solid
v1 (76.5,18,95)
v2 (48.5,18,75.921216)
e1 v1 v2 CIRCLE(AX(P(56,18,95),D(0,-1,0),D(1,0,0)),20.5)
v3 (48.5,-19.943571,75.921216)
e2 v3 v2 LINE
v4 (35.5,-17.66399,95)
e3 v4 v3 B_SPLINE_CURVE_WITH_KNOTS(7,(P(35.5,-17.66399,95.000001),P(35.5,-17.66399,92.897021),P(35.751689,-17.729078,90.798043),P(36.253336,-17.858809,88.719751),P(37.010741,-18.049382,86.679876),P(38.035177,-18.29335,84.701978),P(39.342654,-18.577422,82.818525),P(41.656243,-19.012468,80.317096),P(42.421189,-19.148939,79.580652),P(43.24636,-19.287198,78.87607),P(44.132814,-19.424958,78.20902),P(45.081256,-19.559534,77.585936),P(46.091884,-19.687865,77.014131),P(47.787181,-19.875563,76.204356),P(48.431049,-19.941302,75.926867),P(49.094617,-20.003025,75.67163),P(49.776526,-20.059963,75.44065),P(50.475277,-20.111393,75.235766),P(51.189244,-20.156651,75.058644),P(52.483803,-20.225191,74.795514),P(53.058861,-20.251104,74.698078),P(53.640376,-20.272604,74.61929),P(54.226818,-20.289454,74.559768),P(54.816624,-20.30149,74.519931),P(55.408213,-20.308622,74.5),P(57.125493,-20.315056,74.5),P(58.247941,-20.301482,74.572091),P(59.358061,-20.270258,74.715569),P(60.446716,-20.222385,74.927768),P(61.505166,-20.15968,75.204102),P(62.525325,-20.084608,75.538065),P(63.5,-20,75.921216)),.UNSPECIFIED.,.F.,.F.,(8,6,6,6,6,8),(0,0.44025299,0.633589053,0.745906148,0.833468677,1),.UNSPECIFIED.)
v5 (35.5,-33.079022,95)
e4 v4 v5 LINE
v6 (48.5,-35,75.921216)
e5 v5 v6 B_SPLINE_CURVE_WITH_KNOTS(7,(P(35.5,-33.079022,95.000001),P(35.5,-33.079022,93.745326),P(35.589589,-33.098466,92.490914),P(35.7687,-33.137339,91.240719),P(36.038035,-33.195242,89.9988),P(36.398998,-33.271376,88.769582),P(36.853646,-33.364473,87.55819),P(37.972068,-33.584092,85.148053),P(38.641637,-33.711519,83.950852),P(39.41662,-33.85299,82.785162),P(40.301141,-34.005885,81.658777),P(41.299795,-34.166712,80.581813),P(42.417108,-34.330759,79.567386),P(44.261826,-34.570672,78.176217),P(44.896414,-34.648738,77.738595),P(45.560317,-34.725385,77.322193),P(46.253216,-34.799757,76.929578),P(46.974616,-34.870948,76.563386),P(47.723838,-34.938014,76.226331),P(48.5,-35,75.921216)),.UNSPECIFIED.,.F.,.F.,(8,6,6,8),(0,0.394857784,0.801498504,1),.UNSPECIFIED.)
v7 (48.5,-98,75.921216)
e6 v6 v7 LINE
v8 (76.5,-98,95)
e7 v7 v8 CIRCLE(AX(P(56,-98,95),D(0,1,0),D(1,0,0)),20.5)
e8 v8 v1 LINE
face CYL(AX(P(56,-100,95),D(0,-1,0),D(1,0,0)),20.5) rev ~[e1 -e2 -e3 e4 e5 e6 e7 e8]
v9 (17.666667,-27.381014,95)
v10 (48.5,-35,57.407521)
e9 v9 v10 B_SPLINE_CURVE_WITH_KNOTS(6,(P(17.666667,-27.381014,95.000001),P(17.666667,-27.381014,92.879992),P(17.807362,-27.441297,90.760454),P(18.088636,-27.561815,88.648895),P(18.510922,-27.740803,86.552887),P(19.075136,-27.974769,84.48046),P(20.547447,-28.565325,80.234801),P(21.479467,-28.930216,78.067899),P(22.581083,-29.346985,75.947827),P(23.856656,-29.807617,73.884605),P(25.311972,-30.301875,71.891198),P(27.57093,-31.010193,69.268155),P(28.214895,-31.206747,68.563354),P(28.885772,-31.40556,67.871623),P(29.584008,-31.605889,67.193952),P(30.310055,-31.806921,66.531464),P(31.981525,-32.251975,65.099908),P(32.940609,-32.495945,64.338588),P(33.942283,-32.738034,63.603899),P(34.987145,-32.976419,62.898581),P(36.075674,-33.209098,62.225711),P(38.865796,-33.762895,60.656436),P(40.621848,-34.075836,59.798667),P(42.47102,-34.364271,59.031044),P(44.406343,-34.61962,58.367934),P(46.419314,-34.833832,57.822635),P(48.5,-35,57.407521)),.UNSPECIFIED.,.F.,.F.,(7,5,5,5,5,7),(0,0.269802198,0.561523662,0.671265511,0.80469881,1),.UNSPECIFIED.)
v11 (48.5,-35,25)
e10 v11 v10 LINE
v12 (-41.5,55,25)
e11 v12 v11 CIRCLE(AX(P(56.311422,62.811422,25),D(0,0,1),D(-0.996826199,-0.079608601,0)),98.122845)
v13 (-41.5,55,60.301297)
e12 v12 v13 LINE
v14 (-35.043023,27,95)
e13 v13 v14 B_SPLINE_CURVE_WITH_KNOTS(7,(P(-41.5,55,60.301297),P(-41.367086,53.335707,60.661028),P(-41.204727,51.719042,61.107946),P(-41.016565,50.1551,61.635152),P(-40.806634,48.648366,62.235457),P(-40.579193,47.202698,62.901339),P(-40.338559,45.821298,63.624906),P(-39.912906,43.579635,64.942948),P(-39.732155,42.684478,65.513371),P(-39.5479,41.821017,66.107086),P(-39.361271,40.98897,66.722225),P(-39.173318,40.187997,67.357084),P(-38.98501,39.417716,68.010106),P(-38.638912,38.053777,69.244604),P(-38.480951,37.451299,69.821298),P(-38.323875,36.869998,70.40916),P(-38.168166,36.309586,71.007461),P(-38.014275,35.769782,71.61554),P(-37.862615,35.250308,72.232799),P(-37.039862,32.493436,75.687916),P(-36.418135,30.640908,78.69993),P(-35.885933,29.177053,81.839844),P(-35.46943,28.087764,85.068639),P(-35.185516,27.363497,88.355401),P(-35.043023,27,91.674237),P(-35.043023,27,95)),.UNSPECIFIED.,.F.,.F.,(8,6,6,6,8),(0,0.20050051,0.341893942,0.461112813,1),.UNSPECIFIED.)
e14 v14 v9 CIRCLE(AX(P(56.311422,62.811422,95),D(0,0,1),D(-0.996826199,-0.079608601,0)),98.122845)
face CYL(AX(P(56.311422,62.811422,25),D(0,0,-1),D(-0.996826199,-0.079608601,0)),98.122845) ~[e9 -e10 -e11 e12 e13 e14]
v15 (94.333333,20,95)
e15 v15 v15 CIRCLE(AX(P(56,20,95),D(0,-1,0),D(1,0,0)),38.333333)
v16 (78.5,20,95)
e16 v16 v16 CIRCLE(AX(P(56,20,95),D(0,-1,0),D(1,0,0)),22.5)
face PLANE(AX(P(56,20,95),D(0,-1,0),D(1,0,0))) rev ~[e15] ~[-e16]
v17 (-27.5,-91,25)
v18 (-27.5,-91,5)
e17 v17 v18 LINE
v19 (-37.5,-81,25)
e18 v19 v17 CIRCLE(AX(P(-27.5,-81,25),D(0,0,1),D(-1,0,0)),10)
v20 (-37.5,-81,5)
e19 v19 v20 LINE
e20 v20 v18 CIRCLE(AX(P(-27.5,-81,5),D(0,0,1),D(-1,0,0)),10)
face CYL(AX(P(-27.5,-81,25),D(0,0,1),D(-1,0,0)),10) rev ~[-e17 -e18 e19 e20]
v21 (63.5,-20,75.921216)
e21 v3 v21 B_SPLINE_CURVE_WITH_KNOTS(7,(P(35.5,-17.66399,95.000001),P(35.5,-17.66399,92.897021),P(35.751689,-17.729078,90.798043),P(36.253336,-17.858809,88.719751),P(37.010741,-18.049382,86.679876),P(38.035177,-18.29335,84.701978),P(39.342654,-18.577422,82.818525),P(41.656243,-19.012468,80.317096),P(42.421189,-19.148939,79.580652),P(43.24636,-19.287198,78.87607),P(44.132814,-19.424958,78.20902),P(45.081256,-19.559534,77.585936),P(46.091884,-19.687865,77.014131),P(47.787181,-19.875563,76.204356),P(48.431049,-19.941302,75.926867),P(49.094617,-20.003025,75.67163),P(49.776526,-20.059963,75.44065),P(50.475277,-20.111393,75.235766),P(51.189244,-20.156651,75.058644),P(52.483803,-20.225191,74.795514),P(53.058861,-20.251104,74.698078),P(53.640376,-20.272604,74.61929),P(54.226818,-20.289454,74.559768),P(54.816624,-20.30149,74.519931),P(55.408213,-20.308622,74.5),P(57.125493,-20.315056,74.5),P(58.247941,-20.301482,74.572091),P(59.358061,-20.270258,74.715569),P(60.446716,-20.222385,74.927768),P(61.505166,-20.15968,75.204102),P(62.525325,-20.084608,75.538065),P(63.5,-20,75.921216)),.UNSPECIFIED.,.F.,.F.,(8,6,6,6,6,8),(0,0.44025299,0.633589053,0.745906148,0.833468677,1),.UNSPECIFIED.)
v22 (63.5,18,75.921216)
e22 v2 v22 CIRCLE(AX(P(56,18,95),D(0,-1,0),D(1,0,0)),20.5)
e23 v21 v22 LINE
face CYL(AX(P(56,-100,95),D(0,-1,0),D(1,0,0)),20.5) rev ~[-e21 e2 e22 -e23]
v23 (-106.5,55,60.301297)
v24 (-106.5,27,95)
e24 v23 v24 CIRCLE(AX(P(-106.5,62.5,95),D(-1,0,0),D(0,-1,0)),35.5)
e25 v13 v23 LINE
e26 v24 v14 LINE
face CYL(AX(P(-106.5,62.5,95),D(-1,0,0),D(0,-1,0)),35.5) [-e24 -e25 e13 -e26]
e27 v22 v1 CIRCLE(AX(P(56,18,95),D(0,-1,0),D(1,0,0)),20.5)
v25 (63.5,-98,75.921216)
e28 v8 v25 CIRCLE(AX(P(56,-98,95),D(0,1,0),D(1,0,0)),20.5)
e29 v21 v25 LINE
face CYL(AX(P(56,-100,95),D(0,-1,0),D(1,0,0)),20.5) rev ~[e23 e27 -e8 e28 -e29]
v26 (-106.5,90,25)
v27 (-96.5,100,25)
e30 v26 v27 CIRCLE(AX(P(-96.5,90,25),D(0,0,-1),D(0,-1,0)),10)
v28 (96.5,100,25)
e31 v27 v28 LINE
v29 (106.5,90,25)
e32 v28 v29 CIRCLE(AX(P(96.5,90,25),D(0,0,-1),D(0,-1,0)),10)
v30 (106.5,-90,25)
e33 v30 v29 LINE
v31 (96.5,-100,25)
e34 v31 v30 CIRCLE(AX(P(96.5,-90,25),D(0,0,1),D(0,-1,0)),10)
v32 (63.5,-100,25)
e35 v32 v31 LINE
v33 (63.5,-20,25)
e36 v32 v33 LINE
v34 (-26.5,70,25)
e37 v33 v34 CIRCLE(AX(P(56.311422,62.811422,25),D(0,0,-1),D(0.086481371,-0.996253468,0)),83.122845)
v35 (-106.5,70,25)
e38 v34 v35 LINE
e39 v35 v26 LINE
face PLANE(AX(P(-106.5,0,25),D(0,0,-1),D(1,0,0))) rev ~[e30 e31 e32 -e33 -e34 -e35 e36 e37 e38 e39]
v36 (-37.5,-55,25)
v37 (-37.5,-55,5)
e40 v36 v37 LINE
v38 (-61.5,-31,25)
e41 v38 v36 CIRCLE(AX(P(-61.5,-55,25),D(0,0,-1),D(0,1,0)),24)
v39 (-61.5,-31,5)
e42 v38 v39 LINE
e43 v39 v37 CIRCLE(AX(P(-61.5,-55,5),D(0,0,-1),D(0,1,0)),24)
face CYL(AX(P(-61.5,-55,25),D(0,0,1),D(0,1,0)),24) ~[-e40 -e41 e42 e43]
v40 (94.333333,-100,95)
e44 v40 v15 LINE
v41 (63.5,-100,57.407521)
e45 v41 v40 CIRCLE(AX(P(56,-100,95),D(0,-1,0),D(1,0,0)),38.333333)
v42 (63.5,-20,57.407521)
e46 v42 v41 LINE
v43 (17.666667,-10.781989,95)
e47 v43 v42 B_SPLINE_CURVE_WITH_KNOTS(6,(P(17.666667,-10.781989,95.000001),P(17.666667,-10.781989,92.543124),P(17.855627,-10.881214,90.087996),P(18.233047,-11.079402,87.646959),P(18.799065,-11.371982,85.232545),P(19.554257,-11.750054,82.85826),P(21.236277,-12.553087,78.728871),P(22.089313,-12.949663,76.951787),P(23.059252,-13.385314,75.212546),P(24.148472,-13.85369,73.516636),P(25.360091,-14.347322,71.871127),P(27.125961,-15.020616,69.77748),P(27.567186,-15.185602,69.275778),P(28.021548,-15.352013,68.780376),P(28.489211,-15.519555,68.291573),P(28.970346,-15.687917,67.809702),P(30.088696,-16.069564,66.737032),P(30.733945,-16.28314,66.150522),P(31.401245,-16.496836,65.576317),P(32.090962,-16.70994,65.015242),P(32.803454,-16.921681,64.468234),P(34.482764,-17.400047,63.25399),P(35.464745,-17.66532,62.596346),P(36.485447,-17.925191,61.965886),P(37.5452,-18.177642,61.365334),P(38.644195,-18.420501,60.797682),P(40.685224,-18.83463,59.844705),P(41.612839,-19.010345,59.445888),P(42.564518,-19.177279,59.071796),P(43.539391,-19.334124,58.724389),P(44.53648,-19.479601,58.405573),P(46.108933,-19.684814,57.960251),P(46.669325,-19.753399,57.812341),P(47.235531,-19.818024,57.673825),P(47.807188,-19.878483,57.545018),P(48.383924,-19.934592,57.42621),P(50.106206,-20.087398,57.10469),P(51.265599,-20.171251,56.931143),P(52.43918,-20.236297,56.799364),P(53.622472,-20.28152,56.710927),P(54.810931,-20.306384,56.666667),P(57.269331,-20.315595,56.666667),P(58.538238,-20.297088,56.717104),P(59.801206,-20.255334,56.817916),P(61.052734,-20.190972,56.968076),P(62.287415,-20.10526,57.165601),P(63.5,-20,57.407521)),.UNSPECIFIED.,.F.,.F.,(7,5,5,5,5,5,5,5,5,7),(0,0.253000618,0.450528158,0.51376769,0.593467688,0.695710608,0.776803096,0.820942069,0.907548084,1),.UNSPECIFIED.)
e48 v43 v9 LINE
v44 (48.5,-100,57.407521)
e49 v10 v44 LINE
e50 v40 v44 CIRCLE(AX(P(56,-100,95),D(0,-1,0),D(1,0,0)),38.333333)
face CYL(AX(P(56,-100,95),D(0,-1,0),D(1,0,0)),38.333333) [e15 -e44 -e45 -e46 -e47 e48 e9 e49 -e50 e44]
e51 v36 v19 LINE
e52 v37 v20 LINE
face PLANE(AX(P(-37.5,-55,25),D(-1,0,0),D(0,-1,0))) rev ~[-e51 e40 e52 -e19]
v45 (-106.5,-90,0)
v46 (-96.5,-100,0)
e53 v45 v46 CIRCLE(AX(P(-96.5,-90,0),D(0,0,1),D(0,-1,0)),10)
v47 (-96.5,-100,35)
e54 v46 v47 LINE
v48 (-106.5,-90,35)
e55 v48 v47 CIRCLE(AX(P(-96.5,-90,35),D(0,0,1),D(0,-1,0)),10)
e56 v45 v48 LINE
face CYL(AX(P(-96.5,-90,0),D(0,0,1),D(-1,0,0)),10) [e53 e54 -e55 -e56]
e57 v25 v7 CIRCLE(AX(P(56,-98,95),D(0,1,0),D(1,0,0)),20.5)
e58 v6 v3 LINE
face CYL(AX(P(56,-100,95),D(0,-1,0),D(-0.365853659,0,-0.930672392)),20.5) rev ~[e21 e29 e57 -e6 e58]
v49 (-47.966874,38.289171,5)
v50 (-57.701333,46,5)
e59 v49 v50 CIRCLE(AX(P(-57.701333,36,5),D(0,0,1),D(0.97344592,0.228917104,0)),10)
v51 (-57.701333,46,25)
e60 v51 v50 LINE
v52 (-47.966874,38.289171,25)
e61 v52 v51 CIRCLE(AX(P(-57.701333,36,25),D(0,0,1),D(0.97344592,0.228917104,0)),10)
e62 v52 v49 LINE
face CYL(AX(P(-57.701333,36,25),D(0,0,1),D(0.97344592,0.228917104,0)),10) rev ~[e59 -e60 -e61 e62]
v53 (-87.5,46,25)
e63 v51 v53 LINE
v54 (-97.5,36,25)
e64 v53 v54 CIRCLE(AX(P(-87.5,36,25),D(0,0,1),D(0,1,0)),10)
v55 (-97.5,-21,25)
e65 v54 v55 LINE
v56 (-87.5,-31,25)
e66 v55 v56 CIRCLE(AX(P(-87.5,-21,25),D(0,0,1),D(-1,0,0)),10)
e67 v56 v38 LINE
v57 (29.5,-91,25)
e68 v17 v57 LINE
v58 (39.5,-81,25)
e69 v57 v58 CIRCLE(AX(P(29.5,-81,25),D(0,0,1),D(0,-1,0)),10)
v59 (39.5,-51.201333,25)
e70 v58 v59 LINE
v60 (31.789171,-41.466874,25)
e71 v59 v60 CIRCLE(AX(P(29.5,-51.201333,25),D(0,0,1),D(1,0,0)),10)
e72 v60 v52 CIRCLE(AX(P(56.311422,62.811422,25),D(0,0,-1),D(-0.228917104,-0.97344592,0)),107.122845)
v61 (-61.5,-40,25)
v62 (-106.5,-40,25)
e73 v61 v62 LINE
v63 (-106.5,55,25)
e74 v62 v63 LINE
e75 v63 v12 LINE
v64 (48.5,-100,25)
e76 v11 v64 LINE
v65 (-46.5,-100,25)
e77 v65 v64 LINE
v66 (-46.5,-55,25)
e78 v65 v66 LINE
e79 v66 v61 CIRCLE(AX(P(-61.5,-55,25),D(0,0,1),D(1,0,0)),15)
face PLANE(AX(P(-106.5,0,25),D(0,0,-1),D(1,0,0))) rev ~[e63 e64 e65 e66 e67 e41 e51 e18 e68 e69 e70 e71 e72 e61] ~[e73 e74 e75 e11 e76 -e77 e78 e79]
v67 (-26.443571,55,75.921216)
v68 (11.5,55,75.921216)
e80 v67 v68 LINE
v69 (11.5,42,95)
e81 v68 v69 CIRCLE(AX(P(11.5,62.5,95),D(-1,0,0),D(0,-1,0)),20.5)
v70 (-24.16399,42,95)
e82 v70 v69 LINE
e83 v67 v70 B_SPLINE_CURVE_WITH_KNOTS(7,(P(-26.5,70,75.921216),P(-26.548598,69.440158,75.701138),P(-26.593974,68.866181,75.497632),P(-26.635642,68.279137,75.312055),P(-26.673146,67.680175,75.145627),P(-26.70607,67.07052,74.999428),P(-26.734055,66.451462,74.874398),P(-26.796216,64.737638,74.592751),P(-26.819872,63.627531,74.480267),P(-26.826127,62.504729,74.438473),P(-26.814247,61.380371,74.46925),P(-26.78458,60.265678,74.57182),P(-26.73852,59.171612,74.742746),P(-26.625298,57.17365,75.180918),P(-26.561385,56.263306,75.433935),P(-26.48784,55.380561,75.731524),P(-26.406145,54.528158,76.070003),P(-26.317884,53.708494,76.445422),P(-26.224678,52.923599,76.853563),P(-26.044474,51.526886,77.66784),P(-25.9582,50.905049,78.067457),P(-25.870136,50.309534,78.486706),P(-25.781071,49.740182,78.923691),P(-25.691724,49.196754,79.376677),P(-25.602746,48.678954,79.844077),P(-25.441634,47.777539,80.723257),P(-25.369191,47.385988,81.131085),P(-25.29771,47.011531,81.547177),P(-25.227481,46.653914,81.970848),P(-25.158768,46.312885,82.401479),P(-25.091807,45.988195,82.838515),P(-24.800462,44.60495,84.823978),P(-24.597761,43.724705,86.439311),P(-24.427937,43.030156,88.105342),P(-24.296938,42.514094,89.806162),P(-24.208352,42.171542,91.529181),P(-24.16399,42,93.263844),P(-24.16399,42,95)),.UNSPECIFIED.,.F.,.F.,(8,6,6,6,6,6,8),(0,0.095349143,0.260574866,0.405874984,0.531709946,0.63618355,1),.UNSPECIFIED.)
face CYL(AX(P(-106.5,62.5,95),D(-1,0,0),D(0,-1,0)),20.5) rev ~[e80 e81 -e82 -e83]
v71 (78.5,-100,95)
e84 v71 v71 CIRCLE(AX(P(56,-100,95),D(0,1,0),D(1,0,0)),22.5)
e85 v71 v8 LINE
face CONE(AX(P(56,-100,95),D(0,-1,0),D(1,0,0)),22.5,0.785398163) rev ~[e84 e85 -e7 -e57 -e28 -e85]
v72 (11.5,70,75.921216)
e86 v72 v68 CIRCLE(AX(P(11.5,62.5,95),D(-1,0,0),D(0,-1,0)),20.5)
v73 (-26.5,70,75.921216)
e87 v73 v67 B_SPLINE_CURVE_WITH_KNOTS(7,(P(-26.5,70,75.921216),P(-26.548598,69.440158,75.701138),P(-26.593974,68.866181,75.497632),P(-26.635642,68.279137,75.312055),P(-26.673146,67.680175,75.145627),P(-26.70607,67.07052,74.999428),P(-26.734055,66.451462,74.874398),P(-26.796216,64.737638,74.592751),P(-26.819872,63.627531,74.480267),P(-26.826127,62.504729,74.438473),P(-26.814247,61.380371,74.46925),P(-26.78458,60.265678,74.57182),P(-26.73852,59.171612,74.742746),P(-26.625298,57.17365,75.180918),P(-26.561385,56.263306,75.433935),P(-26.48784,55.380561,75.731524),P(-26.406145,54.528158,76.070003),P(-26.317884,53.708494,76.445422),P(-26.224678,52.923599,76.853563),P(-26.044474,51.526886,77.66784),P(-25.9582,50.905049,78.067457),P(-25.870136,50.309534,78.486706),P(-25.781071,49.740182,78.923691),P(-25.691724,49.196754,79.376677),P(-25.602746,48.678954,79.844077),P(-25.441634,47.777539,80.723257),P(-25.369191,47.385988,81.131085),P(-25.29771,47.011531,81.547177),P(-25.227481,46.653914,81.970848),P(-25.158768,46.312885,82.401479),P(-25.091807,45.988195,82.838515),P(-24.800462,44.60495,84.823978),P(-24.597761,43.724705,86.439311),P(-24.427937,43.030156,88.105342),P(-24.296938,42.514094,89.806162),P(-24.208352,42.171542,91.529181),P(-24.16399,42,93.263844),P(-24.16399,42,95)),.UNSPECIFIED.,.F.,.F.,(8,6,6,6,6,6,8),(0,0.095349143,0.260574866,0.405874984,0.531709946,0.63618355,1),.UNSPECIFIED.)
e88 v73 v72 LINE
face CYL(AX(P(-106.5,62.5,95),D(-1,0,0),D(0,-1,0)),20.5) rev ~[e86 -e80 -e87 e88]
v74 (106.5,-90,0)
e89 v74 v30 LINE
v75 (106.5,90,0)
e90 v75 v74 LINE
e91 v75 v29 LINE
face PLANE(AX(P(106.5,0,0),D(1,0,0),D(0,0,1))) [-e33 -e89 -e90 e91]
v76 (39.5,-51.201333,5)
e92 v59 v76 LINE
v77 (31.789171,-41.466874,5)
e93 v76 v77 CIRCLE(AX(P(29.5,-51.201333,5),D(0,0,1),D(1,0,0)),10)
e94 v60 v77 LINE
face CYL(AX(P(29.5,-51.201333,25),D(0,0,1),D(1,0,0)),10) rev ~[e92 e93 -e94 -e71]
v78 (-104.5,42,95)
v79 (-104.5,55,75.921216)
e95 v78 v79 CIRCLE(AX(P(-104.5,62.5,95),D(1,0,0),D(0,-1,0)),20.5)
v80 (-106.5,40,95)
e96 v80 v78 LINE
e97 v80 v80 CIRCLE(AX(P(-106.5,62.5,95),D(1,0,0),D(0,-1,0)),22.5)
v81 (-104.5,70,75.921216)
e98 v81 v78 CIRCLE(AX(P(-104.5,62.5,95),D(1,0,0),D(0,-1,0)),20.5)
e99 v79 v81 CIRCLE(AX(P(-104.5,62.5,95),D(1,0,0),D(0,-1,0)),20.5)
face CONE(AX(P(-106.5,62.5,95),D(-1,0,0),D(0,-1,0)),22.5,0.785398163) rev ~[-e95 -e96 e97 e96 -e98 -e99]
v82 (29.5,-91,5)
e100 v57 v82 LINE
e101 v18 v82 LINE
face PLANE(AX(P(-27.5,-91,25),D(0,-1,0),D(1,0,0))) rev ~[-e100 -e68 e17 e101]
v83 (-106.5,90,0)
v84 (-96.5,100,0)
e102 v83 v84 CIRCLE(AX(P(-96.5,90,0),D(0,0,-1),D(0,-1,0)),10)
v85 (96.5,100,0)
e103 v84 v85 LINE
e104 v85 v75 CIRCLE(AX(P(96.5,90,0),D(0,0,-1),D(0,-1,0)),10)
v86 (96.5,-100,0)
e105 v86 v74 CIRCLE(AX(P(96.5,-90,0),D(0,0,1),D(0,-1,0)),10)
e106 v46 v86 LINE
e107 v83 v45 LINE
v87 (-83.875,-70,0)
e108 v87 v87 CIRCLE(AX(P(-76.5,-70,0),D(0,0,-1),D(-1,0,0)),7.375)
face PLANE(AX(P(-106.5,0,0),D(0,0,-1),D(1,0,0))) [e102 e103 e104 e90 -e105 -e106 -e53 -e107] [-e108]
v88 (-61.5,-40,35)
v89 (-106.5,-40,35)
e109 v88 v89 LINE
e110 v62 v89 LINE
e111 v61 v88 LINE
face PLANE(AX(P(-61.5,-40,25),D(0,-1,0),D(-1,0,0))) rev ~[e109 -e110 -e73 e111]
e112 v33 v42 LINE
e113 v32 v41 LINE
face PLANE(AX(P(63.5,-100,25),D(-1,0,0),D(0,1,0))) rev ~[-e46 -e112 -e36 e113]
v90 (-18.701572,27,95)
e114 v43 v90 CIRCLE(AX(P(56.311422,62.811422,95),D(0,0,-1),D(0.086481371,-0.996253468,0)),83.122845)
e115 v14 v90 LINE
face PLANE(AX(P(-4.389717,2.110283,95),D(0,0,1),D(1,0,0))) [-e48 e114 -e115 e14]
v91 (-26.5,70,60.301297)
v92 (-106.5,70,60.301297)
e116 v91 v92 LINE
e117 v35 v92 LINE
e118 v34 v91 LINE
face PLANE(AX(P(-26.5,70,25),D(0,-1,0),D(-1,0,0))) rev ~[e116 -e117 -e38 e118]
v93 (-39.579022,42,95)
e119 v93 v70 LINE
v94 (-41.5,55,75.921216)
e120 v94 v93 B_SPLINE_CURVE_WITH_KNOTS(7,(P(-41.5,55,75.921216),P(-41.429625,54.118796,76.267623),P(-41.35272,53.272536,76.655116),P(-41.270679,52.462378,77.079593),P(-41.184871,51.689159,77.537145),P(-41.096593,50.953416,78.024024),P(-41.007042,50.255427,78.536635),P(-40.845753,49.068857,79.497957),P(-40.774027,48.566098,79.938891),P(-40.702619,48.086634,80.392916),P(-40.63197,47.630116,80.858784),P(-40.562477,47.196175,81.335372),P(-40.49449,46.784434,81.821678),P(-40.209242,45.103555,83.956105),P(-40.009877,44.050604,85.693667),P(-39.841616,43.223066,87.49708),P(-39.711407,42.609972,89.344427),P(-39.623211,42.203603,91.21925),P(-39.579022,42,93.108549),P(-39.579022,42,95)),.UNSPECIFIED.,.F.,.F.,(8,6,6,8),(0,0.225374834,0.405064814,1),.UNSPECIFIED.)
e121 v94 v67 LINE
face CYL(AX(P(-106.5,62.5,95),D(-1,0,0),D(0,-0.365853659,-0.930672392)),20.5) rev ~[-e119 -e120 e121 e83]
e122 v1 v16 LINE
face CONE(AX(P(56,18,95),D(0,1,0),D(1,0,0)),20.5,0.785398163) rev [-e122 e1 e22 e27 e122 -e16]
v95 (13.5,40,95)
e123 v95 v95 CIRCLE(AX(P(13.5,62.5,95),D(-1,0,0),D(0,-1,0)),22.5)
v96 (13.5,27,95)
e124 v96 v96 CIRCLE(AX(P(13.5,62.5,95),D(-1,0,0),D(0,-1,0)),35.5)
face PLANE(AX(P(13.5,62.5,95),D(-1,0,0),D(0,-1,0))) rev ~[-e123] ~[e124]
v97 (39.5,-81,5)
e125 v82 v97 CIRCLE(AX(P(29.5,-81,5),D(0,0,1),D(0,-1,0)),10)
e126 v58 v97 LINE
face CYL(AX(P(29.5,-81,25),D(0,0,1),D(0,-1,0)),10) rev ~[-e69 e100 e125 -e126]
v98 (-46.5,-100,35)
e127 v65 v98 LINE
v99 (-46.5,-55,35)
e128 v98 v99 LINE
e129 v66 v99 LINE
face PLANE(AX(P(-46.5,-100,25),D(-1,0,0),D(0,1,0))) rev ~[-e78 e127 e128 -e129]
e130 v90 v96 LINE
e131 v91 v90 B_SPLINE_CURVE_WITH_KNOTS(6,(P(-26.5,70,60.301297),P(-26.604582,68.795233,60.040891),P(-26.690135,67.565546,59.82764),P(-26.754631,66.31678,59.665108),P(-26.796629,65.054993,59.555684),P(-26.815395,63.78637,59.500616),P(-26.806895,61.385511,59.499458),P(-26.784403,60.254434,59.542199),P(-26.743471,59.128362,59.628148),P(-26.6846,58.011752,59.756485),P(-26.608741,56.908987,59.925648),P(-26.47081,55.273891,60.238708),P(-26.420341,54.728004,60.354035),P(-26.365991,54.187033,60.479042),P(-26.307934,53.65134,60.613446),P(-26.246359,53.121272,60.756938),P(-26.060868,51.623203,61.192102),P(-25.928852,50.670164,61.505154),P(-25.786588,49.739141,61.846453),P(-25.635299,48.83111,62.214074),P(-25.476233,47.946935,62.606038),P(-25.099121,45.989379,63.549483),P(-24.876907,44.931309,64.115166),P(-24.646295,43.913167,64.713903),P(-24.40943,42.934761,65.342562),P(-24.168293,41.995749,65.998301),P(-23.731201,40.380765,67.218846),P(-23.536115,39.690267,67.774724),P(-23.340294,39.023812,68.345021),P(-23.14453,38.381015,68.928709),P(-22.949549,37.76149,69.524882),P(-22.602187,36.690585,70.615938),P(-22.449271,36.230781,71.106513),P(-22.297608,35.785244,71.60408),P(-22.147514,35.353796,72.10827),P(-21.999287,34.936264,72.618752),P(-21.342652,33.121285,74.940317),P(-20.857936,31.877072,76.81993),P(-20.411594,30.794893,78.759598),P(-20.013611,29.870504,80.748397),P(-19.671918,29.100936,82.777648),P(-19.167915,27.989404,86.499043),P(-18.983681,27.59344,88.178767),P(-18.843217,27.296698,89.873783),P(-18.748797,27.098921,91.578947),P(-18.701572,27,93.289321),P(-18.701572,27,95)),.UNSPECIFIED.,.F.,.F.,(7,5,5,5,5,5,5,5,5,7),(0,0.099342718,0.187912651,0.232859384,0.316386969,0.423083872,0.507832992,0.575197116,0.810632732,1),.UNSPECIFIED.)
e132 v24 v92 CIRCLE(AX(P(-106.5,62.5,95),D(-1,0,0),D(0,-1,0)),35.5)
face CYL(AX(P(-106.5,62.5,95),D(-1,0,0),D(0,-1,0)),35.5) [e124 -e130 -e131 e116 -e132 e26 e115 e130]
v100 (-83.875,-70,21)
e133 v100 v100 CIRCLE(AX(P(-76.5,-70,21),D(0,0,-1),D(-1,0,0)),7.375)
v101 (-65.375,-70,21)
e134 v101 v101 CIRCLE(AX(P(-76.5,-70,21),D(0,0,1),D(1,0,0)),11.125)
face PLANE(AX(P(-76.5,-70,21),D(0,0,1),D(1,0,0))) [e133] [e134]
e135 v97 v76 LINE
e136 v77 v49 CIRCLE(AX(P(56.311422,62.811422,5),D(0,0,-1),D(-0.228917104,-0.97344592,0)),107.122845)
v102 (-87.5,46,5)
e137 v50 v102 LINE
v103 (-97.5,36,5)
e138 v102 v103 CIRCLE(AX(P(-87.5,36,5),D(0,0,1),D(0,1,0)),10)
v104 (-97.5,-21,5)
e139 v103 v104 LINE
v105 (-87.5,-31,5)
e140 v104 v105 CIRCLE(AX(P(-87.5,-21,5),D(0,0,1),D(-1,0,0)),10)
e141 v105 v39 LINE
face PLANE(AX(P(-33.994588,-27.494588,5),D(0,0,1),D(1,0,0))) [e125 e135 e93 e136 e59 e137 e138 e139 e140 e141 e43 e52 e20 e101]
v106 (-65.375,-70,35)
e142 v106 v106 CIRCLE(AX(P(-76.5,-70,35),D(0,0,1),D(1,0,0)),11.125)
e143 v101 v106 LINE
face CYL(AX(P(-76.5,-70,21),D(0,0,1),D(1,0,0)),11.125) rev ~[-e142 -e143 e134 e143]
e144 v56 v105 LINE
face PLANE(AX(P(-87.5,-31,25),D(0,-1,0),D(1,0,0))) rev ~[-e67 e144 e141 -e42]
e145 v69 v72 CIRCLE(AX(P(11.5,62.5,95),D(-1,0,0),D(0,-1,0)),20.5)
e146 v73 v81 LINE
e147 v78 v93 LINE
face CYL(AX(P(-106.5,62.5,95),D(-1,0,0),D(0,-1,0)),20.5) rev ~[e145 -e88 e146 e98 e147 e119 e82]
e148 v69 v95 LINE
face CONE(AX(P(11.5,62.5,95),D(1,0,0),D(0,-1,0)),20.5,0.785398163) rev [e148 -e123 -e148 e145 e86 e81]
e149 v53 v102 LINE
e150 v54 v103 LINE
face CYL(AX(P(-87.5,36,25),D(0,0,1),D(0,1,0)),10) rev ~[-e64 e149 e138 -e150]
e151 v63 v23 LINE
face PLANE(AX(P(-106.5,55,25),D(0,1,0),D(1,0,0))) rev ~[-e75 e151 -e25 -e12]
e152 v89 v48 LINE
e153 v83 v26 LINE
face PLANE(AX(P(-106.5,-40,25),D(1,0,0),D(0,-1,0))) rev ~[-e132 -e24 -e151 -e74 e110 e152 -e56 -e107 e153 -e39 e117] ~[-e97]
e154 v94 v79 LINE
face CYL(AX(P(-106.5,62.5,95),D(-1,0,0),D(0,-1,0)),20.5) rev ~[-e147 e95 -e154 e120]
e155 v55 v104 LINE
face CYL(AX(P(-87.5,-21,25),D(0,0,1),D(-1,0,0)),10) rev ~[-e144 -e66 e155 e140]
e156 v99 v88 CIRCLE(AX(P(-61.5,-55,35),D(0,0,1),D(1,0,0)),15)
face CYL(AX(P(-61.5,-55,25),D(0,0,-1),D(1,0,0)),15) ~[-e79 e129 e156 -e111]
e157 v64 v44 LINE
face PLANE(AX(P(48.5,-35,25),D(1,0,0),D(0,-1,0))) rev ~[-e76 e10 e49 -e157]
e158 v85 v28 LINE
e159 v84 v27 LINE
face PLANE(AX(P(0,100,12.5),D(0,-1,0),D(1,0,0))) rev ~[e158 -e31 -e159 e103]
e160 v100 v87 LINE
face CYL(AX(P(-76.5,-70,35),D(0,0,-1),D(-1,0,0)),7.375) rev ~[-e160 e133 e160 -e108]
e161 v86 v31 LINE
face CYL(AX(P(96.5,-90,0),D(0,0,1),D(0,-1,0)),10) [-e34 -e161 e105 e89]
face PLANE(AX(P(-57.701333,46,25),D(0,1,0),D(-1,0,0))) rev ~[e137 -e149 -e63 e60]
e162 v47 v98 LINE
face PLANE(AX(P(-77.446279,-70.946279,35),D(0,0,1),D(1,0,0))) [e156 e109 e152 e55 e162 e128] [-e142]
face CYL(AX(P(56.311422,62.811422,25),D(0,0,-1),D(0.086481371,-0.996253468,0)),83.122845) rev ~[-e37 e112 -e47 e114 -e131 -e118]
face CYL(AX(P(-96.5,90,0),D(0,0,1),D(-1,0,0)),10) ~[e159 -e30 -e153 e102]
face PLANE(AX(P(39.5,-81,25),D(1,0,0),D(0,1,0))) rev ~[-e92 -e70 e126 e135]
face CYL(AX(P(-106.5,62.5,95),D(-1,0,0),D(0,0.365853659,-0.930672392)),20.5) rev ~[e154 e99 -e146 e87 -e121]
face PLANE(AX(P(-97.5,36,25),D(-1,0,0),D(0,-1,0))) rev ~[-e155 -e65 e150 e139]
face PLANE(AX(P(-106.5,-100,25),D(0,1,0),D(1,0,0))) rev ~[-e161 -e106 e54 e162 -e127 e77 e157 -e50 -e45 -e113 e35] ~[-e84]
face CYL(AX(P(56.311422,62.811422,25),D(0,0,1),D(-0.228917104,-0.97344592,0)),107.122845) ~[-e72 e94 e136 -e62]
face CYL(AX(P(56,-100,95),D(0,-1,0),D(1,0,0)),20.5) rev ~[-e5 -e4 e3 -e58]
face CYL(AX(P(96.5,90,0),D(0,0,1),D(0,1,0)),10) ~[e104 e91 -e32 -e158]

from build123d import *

# Parameters (mm, degrees)
F0_W            = 213
F0_H            = 25
F1_DEPTH        = 100
F3_DEPTH        = 20
F4_DEPTH        = 70
F5_R            = 38.333333335
F5_R_2          = 20.5
F6_DEPTH        = 120
F7_R            = 35.5
F7_R_2          = 20.5
F8_DEPTH        = 120
F9_DEPTH        = 213.001
F10_DEPTH       = 200.001
F11_DEPTH       = 10
F13_D           = 14.75
F13_CBORE_D     = 22.25
F13_CBORE_DEPTH = 14
F14_R           = 10


# Not quite as in the source:
# - a fillet or chamfer that OpenCascade refuses, or shapes differently, is made with other operations: its cross-section is extruded or revolved along the edge and cut away or added


with BuildPart() as f1:
    # F0 (on Front) → F1 (new body, symmetric)
    with BuildSketch(Plane.XZ):
        with Locations((0, 12.5)):
            Rectangle(F0_W, F0_H)
    extrude(amount=F1_DEPTH, both=True)

    # F2 (on face) → F3 (cut)
    with BuildSketch(Plane.XY.offset(25)):
        with BuildLine():
            ThreePointArc((-97.5, -21), (-94.5710678119, -28.0710678119), (-87.5, -31))
            Line((-87.5, -31), (-61.5, -31))
            ThreePointArc((-61.5, -31), (-44.5294372515, -38.0294372515), (-37.5, -55))
            Line((-37.5, -55), (-37.5, -81))
            ThreePointArc((-37.5, -81), (-34.5710678119, -88.0710678119), (-27.5, -91))
            Line((-27.5, -91), (29.5, -91))
            ThreePointArc((29.5, -91), (36.5710678119, -88.0710678119), (39.5, -81))
            Line((39.5, -81), (39.5, -51.2013330404))
            ThreePointArc((39.5, -51.2013330404), (37.338740663, -44.9921346366), (31.7891710363, -41.4668738378))
            ThreePointArc((31.7891710363, -41.4668738378), (-19.4358675785, -12.9358675785), (-47.9668738378, 38.2891710363))
            ThreePointArc((-47.9668738378, 38.2891710363), (-51.4921346366, 43.838740663), (-57.7013330404, 46))
            Line((-57.7013330404, 46), (-87.5, 46))
            ThreePointArc((-87.5, 46), (-94.5710678119, 43.0710678119), (-97.5, 36))
            Line((-97.5, 36), (-97.5, -21))
        make_face()
    extrude(amount=-F3_DEPTH, mode=Mode.SUBTRACT)

    # F2 (on face) → F4 (join)
    with BuildSketch(Plane.XY.offset(25)):
        with BuildLine():
            Line((-26.5, 70), (-106.5, 70))
            Line((-106.5, 70), (-106.5, 55))
            Line((-106.5, 55), (-41.5, 55))
            ThreePointArc((-41.5, 55), (-13.0719065478, -6.5719065478), (48.5, -35))
            Line((48.5, -35), (48.5, -100))
            Line((48.5, -100), (63.5, -100))
            Line((63.5, -100), (63.5, -20))
            ThreePointArc((63.5, -20), (-2.46530483, 4.03469517), (-26.5, 70))
        make_face()
    extrude(amount=F4_DEPTH)

    # F5 (on face) → F6 (join)
    with BuildSketch(Plane.XZ.offset(100)):
        with Locations((56, 95)):
            Circle(F5_R)
        with Locations((56, 95)):
            Circle(F5_R_2, mode=Mode.SUBTRACT)
    extrude(amount=-F6_DEPTH)

    # F7 (on face) → F8 (join)
    with BuildSketch(Plane(origin=(-106.5, 0, 0), x_dir=(0, -1, 0), z_dir=(-1, 0, 0))):
        with Locations((-62.5, 95)):
            Circle(F7_R)
        with Locations((-62.5, 95)):
            Circle(F7_R_2, mode=Mode.SUBTRACT)
    extrude(amount=-F8_DEPTH)

    # F7 (on face) → F9 (cut, through all)
    with BuildSketch(Plane(origin=(-106.5, 0, 0), x_dir=(0, -1, 0), z_dir=(-1, 0, 0))):
        with BuildLine():
            ThreePointArc((-42, 95), (-74.0433963806, 111.9410743461), (-70, 75.9212159717))
            Line((-70, 75.9212159717), (-70, 95))
            Line((-70, 95), (-55, 95))
            Line((-55, 95), (-55, 75.9212159717))
            ThreePointArc((-55, 75.9212159717), (-45.5589256539, 83.4566036194), (-42, 95))
        make_face()
        with BuildLine():
            Line((-70, 95), (-70, 75.9212159717))
            ThreePointArc((-70, 75.9212159717), (-62.5, 74.5), (-55, 75.9212159717))
            Line((-55, 75.9212159717), (-55, 95))
            Line((-55, 95), (-70, 95))
        make_face()
    extrude(amount=-F9_DEPTH, mode=Mode.SUBTRACT)

    # F5 (on face) → F10 (cut, through all)
    with BuildSketch(Plane.XZ.offset(100)):
        with BuildLine():
            ThreePointArc((76.5, 95), (44.4566036194, 111.9410743461), (48.5, 75.9212159717))
            Line((48.5, 75.9212159717), (48.5, 95))
            Line((48.5, 95), (63.5, 95))
            Line((63.5, 95), (63.5, 75.9212159717))
            ThreePointArc((63.5, 75.9212159717), (72.9410743461, 83.4566036194), (76.5, 95))
        make_face()
        with BuildLine():
            Line((48.5, 95), (48.5, 75.9212159717))
            ThreePointArc((48.5, 75.9212159717), (56, 74.5), (63.5, 75.9212159717))
            Line((63.5, 75.9212159717), (63.5, 95))
            Line((63.5, 95), (48.5, 95))
        make_face()
    extrude(amount=-F10_DEPTH, mode=Mode.SUBTRACT)

    # F2 (on face) → F11 (join)
    with BuildSketch(Plane.XY.offset(25)):
        with BuildLine():
            Line((-61.5, -40), (-106.5, -40))
            Line((-106.5, -40), (-106.5, -100))
            Line((-106.5, -100), (-46.5, -100))
            Line((-46.5, -100), (-46.5, -55))
            ThreePointArc((-46.5, -55), (-50.8933982822, -44.3933982822), (-61.5, -40))
        make_face()
    extrude(amount=F11_DEPTH)

    # F13 (through all)
    with Locations(Plane.XY.offset(35)):
        with Locations((-76.5, -70)):
            CounterBoreHole(F13_D / 2, F13_CBORE_D / 2, F13_CBORE_DEPTH)

    # F14
    f14_edges = [f1.edges().sort_by_distance(p)[0] for p in [
        (106.5, -100, 12.5),
        (106.5, 100, 12.5),
        (-106.5, 100, 12.5),
        (-106.5, -100, 17.5),
    ]]
    fillet(f14_edges, radius=F14_R)

    # F15: chamfer of 2 on 4 edges, made by hand

    # F15_s1 → F15_t2 (revolve, cut)
    with BuildSketch(Plane.XY.offset(95)):
        Polygon((78.5, -100), (76.5, -98), (76.5, -100), align=None)
    revolve(axis=Axis((56, -100, 95), (0, 1, 0)), mode=Mode.SUBTRACT)

    # F15_s3 → F15_t4 (revolve, cut)
    with BuildSketch(Plane.XY.offset(95)):
        Polygon((-106.5, 40), (-104.5, 42), (-106.5, 42), align=None)
    revolve(axis=Axis((-106.5, 62.5, 95), (1, 0, 0)), mode=Mode.SUBTRACT)

    # F15_s5 → F15_t6 (revolve, cut)
    with BuildSketch(Plane.XY.offset(95)):
        Polygon((11.5, 42), (13.5, 40), (13.5, 42), align=None)
    revolve(axis=Axis((13.5, 62.5, 95), (-1, 0, 0)), mode=Mode.SUBTRACT)

    # F15_s7 → F15_t8 (revolve, cut)
    with BuildSketch(Plane.XY.offset(95)):
        Polygon((76.5, 18), (78.5, 20), (76.5, 20), align=None)
    revolve(axis=Axis((56, 20, 95), (0, -1, 0)), mode=Mode.SUBTRACT)


solid = f1.part
